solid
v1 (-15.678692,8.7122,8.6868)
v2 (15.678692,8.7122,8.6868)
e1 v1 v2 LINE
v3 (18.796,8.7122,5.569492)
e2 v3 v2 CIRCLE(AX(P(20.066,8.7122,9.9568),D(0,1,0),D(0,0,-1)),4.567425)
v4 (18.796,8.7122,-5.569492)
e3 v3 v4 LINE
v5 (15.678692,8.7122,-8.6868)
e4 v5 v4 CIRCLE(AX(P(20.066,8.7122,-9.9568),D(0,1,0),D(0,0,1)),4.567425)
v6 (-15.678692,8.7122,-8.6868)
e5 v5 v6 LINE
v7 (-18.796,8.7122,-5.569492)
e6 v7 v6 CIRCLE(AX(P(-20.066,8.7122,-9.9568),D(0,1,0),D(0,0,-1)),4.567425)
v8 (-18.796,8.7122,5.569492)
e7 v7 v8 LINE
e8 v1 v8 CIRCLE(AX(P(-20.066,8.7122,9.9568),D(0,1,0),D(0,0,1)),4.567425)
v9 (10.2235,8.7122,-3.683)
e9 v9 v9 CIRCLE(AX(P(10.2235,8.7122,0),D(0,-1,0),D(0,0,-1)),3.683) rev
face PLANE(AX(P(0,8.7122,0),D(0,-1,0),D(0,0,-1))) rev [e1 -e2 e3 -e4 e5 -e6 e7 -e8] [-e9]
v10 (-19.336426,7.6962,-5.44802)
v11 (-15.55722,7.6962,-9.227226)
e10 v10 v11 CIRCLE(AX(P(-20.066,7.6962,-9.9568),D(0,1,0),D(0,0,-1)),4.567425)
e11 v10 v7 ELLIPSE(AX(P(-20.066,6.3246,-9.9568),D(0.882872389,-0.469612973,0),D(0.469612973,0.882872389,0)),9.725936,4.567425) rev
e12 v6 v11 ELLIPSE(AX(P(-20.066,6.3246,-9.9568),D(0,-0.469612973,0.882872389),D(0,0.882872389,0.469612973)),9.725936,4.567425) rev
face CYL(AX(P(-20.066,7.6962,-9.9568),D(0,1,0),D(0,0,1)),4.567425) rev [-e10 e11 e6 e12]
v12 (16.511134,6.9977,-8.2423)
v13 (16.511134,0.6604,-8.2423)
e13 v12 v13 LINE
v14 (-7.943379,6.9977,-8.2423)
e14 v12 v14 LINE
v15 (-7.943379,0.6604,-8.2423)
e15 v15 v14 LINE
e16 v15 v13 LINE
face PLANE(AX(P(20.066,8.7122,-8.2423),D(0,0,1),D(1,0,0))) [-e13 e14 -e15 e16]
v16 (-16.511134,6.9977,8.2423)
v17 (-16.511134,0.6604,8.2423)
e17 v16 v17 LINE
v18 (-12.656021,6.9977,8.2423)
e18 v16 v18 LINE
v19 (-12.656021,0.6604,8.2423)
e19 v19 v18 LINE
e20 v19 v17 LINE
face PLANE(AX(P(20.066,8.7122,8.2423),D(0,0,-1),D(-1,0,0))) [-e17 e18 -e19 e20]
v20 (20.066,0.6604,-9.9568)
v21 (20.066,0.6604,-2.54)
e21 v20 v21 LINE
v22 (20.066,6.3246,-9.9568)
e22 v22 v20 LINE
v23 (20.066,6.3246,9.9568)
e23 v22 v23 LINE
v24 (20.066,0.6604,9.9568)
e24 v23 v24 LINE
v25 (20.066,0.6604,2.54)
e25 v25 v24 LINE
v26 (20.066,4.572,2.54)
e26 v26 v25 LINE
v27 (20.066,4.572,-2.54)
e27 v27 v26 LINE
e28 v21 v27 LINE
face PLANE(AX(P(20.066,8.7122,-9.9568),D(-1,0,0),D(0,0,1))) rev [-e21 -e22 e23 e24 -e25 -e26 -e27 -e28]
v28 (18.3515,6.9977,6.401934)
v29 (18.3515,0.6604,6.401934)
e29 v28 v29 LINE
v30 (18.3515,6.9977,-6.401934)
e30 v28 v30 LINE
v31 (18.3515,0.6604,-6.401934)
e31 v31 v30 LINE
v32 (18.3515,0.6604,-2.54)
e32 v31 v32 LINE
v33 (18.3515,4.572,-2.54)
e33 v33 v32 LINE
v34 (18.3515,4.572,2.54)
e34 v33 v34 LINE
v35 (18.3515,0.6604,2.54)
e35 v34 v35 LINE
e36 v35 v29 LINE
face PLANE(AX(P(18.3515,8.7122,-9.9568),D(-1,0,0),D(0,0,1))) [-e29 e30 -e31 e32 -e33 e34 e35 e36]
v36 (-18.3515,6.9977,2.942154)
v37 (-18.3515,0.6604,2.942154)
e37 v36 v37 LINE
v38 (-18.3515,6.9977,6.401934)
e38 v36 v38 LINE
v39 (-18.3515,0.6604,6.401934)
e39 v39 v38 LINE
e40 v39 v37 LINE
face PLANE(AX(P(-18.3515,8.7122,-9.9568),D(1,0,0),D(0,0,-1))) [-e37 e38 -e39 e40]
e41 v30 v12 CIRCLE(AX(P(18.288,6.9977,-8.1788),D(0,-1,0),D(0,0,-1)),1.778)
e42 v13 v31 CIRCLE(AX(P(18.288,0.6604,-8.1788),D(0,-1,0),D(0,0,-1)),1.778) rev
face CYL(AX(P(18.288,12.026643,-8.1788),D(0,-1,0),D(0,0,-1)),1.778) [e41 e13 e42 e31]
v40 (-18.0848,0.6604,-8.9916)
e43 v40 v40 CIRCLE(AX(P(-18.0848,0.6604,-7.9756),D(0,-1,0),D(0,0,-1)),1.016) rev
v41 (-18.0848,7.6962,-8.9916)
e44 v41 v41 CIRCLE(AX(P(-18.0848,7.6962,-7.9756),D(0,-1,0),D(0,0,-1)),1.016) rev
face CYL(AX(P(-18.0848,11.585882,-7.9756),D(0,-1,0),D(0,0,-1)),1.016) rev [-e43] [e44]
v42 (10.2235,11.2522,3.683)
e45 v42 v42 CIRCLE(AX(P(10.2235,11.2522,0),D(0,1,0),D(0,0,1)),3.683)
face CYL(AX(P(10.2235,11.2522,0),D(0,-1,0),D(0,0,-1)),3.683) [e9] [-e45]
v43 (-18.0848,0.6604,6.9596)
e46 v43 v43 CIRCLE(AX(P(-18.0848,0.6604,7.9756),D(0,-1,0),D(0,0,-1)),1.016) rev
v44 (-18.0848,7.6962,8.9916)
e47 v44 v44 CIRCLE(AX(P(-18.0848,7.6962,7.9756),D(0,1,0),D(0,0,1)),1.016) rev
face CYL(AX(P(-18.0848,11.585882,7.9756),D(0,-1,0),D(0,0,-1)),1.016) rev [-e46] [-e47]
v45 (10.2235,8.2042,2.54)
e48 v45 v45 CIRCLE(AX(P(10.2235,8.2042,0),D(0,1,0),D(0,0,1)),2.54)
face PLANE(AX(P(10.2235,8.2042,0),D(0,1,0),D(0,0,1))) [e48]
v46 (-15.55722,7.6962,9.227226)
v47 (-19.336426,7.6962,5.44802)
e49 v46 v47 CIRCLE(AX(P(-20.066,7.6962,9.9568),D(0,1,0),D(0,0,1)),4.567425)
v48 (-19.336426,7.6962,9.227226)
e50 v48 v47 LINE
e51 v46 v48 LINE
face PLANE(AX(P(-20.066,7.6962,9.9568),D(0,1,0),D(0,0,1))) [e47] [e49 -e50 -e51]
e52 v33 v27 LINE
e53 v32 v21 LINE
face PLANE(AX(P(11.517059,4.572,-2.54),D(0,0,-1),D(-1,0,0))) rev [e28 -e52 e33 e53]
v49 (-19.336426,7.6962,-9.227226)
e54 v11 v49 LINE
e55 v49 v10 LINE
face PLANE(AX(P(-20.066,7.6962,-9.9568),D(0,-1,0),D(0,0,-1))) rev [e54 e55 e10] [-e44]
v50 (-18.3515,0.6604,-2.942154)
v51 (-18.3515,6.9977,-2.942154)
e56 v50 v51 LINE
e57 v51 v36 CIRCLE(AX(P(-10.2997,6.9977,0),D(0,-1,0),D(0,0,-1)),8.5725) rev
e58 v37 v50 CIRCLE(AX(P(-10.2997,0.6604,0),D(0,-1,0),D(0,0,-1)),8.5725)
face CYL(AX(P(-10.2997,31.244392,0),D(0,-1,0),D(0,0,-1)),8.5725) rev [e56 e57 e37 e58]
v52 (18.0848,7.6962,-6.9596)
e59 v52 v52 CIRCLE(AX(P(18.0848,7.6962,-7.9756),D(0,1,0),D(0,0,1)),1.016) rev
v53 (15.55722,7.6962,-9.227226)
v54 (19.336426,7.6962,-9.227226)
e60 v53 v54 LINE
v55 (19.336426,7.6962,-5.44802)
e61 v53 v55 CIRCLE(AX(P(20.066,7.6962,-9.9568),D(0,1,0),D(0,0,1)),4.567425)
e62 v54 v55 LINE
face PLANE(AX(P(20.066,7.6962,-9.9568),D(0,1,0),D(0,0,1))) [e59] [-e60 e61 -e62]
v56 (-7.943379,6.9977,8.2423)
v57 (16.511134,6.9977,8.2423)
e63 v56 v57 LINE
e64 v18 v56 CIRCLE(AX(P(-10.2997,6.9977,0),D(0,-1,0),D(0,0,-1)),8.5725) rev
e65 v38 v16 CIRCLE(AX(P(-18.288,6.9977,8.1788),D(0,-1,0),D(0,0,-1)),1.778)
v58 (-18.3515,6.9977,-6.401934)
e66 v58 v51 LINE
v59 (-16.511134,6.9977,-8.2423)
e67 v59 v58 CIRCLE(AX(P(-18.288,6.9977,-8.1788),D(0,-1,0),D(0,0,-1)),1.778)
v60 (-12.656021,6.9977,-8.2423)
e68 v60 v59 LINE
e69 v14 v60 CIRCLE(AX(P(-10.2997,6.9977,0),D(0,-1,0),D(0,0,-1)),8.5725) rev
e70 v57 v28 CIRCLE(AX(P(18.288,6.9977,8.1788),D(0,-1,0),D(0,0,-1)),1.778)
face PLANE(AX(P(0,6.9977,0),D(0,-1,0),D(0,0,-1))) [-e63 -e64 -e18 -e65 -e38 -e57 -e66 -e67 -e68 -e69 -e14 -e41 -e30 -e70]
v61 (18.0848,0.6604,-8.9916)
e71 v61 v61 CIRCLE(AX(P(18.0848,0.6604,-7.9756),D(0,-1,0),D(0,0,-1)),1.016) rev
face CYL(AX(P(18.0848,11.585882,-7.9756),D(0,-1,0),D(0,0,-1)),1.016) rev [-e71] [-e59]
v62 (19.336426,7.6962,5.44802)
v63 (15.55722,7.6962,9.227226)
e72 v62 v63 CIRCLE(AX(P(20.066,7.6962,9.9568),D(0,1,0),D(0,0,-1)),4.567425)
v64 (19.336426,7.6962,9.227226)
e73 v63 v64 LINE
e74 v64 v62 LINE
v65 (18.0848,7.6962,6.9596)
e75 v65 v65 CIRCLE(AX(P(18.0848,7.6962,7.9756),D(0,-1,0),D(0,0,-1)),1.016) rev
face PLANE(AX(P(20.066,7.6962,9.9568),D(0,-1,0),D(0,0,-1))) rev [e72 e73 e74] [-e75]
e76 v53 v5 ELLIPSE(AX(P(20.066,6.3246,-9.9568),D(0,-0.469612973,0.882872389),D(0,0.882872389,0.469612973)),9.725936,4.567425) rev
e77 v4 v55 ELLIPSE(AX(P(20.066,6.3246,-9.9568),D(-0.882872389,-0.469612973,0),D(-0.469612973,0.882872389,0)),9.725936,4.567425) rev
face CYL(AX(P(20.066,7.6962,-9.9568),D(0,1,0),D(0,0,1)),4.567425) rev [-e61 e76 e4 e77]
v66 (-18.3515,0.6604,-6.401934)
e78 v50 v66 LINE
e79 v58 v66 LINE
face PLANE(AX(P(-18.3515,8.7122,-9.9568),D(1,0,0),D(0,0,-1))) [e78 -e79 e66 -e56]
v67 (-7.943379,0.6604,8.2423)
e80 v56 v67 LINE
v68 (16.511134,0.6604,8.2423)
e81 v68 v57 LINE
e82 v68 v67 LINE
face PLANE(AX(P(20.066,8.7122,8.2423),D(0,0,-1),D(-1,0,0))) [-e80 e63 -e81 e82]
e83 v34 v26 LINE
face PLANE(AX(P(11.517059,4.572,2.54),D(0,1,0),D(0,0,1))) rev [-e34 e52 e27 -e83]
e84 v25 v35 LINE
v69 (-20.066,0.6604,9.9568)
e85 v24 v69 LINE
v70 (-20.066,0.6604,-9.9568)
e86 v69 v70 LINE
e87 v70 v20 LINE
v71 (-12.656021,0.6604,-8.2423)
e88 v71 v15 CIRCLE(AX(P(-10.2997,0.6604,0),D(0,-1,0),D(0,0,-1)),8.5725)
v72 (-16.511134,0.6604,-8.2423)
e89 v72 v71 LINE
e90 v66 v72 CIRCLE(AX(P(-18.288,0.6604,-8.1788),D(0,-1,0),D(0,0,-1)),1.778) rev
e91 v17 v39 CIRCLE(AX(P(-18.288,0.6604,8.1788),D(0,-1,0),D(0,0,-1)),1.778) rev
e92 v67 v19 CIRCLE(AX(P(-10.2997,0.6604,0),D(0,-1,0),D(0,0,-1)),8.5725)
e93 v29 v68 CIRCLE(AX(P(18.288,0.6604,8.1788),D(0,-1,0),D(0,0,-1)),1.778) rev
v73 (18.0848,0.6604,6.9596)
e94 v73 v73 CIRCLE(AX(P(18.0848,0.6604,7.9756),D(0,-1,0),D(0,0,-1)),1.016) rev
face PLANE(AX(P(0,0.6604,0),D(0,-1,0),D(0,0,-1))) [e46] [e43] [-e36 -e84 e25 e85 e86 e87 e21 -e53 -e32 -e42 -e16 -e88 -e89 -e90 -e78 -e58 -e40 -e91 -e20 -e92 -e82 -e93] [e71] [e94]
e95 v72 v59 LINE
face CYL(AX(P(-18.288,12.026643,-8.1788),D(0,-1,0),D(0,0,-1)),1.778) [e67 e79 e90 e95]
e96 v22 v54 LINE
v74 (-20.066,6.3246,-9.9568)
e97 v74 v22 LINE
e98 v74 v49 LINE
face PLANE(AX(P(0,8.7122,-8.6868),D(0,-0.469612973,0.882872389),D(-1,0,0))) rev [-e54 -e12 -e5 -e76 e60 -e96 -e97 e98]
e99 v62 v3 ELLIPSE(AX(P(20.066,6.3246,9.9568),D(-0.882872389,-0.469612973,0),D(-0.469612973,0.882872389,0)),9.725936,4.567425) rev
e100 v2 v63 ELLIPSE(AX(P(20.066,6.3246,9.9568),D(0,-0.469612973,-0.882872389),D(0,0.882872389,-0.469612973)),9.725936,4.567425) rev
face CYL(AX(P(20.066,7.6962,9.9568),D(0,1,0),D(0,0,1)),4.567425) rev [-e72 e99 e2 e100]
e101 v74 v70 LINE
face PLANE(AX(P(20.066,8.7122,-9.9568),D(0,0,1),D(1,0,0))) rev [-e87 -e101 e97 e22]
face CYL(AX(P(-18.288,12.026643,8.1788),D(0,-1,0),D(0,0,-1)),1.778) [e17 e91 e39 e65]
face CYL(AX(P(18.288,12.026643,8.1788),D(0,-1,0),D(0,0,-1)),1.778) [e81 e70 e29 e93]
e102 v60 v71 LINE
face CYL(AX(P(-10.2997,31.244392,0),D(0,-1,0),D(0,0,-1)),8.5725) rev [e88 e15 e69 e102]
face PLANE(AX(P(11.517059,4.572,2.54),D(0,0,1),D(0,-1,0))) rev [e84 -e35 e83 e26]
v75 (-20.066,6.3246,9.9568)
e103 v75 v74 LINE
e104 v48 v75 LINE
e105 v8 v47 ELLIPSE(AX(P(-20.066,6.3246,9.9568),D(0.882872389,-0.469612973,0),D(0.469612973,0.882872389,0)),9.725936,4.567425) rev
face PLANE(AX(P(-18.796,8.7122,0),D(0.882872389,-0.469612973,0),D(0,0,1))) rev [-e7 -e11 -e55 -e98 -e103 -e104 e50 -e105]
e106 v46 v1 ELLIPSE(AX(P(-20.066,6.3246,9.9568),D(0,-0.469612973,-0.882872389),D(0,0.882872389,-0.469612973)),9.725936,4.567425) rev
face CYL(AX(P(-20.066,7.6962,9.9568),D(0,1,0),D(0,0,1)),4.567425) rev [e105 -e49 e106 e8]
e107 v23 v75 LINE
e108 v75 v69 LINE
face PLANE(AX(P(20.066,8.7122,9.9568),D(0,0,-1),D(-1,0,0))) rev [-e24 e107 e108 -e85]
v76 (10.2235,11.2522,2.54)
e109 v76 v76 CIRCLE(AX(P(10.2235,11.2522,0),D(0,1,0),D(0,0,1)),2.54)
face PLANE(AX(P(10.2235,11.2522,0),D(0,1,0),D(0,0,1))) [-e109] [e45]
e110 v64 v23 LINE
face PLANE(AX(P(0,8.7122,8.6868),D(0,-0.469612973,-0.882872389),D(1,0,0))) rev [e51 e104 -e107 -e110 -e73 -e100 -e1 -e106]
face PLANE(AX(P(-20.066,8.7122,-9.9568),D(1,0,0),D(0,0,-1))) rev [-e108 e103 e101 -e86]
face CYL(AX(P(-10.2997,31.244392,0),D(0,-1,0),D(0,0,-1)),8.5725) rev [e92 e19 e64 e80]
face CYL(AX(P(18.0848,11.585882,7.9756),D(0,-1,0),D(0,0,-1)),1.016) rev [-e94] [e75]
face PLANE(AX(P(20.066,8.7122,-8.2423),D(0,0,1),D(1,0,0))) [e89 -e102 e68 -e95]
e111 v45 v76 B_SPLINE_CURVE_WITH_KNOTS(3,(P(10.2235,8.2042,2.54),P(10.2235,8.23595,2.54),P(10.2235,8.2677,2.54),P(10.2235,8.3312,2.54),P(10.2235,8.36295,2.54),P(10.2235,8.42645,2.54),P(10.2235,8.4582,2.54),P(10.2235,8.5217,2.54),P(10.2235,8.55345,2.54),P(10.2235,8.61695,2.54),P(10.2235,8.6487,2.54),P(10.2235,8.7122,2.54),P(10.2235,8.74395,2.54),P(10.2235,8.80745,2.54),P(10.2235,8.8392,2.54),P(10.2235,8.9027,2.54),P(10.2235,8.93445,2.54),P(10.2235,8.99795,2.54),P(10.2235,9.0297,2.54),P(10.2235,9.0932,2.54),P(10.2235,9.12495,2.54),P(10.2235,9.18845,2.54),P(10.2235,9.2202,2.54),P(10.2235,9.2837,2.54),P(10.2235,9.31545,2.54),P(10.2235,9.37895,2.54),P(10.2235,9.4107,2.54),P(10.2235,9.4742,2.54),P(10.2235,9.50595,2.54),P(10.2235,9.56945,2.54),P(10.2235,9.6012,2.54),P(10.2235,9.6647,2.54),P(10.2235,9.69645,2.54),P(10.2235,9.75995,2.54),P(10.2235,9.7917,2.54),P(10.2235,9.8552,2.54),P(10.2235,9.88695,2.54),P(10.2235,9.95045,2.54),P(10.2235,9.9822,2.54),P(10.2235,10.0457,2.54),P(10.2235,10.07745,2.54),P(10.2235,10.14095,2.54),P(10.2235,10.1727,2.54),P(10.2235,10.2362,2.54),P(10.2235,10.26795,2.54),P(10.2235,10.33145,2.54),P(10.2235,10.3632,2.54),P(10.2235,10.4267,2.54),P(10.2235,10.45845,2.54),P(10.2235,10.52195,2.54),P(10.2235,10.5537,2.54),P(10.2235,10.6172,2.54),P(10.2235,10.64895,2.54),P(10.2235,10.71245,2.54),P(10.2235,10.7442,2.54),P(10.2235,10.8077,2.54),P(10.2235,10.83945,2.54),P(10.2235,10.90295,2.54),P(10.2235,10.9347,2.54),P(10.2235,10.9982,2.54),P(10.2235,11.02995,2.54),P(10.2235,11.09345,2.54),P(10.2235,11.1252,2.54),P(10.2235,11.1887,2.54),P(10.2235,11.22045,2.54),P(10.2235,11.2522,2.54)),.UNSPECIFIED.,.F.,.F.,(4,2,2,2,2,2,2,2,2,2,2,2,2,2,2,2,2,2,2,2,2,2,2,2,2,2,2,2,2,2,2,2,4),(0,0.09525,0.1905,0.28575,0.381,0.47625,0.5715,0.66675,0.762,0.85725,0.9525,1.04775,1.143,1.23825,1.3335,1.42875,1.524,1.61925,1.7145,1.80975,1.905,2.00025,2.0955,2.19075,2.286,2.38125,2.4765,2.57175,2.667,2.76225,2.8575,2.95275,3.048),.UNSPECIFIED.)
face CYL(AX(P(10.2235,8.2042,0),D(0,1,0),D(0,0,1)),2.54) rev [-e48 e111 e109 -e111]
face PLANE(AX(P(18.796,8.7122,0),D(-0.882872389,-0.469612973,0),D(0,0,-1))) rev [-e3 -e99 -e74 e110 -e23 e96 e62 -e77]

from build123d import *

# Parameters (mm, degrees)
SKETCH1_W           = 40.132
SKETCH1_H           = 19.9136
BOSS_EXTRUDE1_DEPTH = 8.7122
SHELL1_T            = -1.7145
SKETCH3_R           = 3.683
BOSS_EXTRUDE2_DEPTH = 2.54
SKETCH4_R           = 2.54
CUT_EXTRUDE2_DEPTH  = 3.048
SKETCH8_R           = 1.778
BOSS_EXTRUDE5_DEPTH = 6.9977
SKETCH7_R           = 1.016
CUT_EXTRUDE5_DEPTH  = 8.7122
CHAMFER1_SIZE       = 2.3876
CHAMFER1_SIZE_2     = 1.27
SKETCH2_R           = 4.567425491
CUT_EXTRUDE6_DEPTH  = 1.016
SKETCH10_W          = 40.259
SKETCH10_H          = 19.9136
CUT_EXTRUDE7_DEPTH  = 0.6604
SKETCH11_W          = 5.08
SKETCH11_H          = 4.572
CUT_EXTRUDE8_DEPTH  = 1.7145
SKETCH12_R          = 8.5725
CUT_EXTRUDE9_DEPTH  = 6.9977


with BuildPart() as part:
    # Sketch1 → Boss-Extrude1 (new body)
    with BuildSketch(Plane(origin=(0, 0, 0), x_dir=(1, 0, 0), z_dir=(0, 1, 0))):
        Rectangle(SKETCH1_W, SKETCH1_H)
    extrude(amount=BOSS_EXTRUDE1_DEPTH)

    # Shell1
    shell1_openings = [part.faces().sort_by_distance(p)[0] for p in [
        (0, 0, 0),
    ]]
    offset(amount=SHELL1_T, openings=shell1_openings, kind=Kind.INTERSECTION)

    # Sketch3 → Boss-Extrude2 (add)
    with BuildSketch(Plane(origin=(0, 8.7122, 0), x_dir=(1, 0, 0), z_dir=(0, 1, 0))):
        with Locations(Location((10.2235, 0, 0), (0, 0, 90))):
            Circle(SKETCH3_R)
    extrude(amount=BOSS_EXTRUDE2_DEPTH)

    # Sketch4 → Cut-Extrude2 (cut)
    with BuildSketch(Plane(origin=(0, 11.2522, 0), x_dir=(1, 0, 0), z_dir=(0, 1, 0))):
        with Locations(Location((10.2235, 0, 0), (0, 0, 270))):
            Circle(SKETCH4_R)
    extrude(amount=-CUT_EXTRUDE2_DEPTH, mode=Mode.SUBTRACT)

    # Sketch8 → Boss-Extrude5 (add)
    with BuildSketch(Plane(origin=(0, 0, 0), x_dir=(-1, 0, 0), z_dir=(0, -1, 0))):
        with Locations((18.288, 8.1788)):
            Circle(SKETCH8_R)
        with Locations((-18.288, 8.1788)):
            Circle(SKETCH8_R)
        with Locations((18.288, -8.1788)):
            Circle(SKETCH8_R)
        with Locations((-18.288, -8.1788)):
            Circle(SKETCH8_R)
    extrude(amount=-BOSS_EXTRUDE5_DEPTH)

    # Sketch7 → Cut-Extrude5 (cut)
    with BuildSketch(Plane(origin=(0, 0, 0), x_dir=(-1, 0, 0), z_dir=(0, -1, 0))):
        with Locations(Location((18.0848, 7.9756, 0), (0, 0, 90))):
            Circle(SKETCH7_R)
        with Locations(Location((-18.0848, 7.9756, 0), (0, 0, 90))):
            Circle(SKETCH7_R)
        with Locations(Location((18.0848, -7.9756, 0), (0, 0, 90))):
            Circle(SKETCH7_R)
        with Locations(Location((-18.0848, -7.9756, 0), (0, 0, 90))):
            Circle(SKETCH7_R)
    extrude(amount=-CUT_EXTRUDE5_DEPTH, mode=Mode.SUBTRACT)

    # Chamfer1
    # the kernel refuses this chamfer: 2.3876, 1.27 mm, written as the material it takes off along each edge
    with BuildSketch(Plane(origin=(20.066, 8.7122, 16.137611711), x_dir=(0.018140787758026848, -0.9998354423701522, 0), z_dir=(0, 0, -1))) as chamfer1_piece_1:
        Polygon((CHAMFER1_SIZE * 0.99983544237, CHAMFER1_SIZE * 0.018140787758), (-CHAMFER1_SIZE_2 * 0.018140787758, CHAMFER1_SIZE_2 * 0.99983544237), (0, 0), align=None)
    extrude(amount=32.275223423, mode=Mode.SUBTRACT)
    with BuildSketch(Plane(origin=(26.246811711, 8.7122, -9.9568), x_dir=(0, -0.9998354423701524, -0.01814078775802685), z_dir=(-1, 0, 0))) as chamfer1_piece_2:
        Polygon((CHAMFER1_SIZE * 0.99983544237, CHAMFER1_SIZE * 0.018140787758), (-CHAMFER1_SIZE_2 * 0.018140787758, CHAMFER1_SIZE_2 * 0.99983544237), (0, 0), align=None)
    extrude(amount=52.493623423, mode=Mode.SUBTRACT)
    with BuildSketch(Plane(origin=(-20.066, 8.7122, -16.137611711), x_dir=(0.9979501613334688, 0.06399590216962081, 0), z_dir=(0, 0, 1))) as chamfer1_piece_3:
        Polygon((CHAMFER1_SIZE_2 * 0.997950161333, -CHAMFER1_SIZE_2 * 0.0639959021696), (-CHAMFER1_SIZE * 0.0639959021696, -CHAMFER1_SIZE * 0.997950161333), (0, 0), align=None)
    extrude(amount=32.275223423, mode=Mode.SUBTRACT)
    with BuildSketch(Plane(origin=(-26.246811711, 8.7122, 9.9568), x_dir=(0, 0.06399590216962081, -0.9979501613334687), z_dir=(1, 0, 0))) as chamfer1_piece_4:
        Polygon((CHAMFER1_SIZE_2 * 0.997950161333, -CHAMFER1_SIZE_2 * 0.0639959021696), (-CHAMFER1_SIZE * 0.0639959021696, -CHAMFER1_SIZE * 0.997950161333), (0, 0), align=None)
    extrude(amount=52.493623423, mode=Mode.SUBTRACT)

    # Sketch2 → Cut-Extrude6 (cut)
    with BuildSketch(Plane(origin=(0, 8.7122, 0), x_dir=(1, 0, 0), z_dir=(0, 1, 0))):
        with Locations((20.066, 9.9568)):
            Circle(SKETCH2_R)
        with Locations((-20.066, 9.9568)):
            Circle(SKETCH2_R)
        with Locations((-20.066, -9.9568)):
            Circle(SKETCH2_R)
        with Locations((20.066, -9.9568)):
            Circle(SKETCH2_R)
    extrude(amount=-CUT_EXTRUDE6_DEPTH, mode=Mode.SUBTRACT)

    # Sketch10 → Cut-Extrude7 (cut)
    with BuildSketch(Plane(origin=(0, 0, 0), x_dir=(-1, 0, 0), z_dir=(0, -1, 0))):
        with Locations((0.0635, 0)):
            Rectangle(SKETCH10_W, SKETCH10_H)
    extrude(amount=-CUT_EXTRUDE7_DEPTH, mode=Mode.SUBTRACT)

    # Sketch11 → Cut-Extrude8 (cut)
    with BuildSketch(Plane(origin=(20.066, 0, 0), x_dir=(0, 0, -1), z_dir=(1, 0, 0))):
        with Locations((0, 2.286)):
            Rectangle(SKETCH11_W, SKETCH11_H)
    extrude(amount=-CUT_EXTRUDE8_DEPTH, mode=Mode.SUBTRACT)

    # Sketch12 → Cut-Extrude9 (cut)
    with BuildSketch(Plane(origin=(0, 0, 0), x_dir=(-1, 0, 0), z_dir=(0, -1, 0))):
        with Locations((10.2997, 0)):
            Circle(SKETCH12_R)
    extrude(amount=-CUT_EXTRUDE9_DEPTH, mode=Mode.SUBTRACT)


solid = part.part
